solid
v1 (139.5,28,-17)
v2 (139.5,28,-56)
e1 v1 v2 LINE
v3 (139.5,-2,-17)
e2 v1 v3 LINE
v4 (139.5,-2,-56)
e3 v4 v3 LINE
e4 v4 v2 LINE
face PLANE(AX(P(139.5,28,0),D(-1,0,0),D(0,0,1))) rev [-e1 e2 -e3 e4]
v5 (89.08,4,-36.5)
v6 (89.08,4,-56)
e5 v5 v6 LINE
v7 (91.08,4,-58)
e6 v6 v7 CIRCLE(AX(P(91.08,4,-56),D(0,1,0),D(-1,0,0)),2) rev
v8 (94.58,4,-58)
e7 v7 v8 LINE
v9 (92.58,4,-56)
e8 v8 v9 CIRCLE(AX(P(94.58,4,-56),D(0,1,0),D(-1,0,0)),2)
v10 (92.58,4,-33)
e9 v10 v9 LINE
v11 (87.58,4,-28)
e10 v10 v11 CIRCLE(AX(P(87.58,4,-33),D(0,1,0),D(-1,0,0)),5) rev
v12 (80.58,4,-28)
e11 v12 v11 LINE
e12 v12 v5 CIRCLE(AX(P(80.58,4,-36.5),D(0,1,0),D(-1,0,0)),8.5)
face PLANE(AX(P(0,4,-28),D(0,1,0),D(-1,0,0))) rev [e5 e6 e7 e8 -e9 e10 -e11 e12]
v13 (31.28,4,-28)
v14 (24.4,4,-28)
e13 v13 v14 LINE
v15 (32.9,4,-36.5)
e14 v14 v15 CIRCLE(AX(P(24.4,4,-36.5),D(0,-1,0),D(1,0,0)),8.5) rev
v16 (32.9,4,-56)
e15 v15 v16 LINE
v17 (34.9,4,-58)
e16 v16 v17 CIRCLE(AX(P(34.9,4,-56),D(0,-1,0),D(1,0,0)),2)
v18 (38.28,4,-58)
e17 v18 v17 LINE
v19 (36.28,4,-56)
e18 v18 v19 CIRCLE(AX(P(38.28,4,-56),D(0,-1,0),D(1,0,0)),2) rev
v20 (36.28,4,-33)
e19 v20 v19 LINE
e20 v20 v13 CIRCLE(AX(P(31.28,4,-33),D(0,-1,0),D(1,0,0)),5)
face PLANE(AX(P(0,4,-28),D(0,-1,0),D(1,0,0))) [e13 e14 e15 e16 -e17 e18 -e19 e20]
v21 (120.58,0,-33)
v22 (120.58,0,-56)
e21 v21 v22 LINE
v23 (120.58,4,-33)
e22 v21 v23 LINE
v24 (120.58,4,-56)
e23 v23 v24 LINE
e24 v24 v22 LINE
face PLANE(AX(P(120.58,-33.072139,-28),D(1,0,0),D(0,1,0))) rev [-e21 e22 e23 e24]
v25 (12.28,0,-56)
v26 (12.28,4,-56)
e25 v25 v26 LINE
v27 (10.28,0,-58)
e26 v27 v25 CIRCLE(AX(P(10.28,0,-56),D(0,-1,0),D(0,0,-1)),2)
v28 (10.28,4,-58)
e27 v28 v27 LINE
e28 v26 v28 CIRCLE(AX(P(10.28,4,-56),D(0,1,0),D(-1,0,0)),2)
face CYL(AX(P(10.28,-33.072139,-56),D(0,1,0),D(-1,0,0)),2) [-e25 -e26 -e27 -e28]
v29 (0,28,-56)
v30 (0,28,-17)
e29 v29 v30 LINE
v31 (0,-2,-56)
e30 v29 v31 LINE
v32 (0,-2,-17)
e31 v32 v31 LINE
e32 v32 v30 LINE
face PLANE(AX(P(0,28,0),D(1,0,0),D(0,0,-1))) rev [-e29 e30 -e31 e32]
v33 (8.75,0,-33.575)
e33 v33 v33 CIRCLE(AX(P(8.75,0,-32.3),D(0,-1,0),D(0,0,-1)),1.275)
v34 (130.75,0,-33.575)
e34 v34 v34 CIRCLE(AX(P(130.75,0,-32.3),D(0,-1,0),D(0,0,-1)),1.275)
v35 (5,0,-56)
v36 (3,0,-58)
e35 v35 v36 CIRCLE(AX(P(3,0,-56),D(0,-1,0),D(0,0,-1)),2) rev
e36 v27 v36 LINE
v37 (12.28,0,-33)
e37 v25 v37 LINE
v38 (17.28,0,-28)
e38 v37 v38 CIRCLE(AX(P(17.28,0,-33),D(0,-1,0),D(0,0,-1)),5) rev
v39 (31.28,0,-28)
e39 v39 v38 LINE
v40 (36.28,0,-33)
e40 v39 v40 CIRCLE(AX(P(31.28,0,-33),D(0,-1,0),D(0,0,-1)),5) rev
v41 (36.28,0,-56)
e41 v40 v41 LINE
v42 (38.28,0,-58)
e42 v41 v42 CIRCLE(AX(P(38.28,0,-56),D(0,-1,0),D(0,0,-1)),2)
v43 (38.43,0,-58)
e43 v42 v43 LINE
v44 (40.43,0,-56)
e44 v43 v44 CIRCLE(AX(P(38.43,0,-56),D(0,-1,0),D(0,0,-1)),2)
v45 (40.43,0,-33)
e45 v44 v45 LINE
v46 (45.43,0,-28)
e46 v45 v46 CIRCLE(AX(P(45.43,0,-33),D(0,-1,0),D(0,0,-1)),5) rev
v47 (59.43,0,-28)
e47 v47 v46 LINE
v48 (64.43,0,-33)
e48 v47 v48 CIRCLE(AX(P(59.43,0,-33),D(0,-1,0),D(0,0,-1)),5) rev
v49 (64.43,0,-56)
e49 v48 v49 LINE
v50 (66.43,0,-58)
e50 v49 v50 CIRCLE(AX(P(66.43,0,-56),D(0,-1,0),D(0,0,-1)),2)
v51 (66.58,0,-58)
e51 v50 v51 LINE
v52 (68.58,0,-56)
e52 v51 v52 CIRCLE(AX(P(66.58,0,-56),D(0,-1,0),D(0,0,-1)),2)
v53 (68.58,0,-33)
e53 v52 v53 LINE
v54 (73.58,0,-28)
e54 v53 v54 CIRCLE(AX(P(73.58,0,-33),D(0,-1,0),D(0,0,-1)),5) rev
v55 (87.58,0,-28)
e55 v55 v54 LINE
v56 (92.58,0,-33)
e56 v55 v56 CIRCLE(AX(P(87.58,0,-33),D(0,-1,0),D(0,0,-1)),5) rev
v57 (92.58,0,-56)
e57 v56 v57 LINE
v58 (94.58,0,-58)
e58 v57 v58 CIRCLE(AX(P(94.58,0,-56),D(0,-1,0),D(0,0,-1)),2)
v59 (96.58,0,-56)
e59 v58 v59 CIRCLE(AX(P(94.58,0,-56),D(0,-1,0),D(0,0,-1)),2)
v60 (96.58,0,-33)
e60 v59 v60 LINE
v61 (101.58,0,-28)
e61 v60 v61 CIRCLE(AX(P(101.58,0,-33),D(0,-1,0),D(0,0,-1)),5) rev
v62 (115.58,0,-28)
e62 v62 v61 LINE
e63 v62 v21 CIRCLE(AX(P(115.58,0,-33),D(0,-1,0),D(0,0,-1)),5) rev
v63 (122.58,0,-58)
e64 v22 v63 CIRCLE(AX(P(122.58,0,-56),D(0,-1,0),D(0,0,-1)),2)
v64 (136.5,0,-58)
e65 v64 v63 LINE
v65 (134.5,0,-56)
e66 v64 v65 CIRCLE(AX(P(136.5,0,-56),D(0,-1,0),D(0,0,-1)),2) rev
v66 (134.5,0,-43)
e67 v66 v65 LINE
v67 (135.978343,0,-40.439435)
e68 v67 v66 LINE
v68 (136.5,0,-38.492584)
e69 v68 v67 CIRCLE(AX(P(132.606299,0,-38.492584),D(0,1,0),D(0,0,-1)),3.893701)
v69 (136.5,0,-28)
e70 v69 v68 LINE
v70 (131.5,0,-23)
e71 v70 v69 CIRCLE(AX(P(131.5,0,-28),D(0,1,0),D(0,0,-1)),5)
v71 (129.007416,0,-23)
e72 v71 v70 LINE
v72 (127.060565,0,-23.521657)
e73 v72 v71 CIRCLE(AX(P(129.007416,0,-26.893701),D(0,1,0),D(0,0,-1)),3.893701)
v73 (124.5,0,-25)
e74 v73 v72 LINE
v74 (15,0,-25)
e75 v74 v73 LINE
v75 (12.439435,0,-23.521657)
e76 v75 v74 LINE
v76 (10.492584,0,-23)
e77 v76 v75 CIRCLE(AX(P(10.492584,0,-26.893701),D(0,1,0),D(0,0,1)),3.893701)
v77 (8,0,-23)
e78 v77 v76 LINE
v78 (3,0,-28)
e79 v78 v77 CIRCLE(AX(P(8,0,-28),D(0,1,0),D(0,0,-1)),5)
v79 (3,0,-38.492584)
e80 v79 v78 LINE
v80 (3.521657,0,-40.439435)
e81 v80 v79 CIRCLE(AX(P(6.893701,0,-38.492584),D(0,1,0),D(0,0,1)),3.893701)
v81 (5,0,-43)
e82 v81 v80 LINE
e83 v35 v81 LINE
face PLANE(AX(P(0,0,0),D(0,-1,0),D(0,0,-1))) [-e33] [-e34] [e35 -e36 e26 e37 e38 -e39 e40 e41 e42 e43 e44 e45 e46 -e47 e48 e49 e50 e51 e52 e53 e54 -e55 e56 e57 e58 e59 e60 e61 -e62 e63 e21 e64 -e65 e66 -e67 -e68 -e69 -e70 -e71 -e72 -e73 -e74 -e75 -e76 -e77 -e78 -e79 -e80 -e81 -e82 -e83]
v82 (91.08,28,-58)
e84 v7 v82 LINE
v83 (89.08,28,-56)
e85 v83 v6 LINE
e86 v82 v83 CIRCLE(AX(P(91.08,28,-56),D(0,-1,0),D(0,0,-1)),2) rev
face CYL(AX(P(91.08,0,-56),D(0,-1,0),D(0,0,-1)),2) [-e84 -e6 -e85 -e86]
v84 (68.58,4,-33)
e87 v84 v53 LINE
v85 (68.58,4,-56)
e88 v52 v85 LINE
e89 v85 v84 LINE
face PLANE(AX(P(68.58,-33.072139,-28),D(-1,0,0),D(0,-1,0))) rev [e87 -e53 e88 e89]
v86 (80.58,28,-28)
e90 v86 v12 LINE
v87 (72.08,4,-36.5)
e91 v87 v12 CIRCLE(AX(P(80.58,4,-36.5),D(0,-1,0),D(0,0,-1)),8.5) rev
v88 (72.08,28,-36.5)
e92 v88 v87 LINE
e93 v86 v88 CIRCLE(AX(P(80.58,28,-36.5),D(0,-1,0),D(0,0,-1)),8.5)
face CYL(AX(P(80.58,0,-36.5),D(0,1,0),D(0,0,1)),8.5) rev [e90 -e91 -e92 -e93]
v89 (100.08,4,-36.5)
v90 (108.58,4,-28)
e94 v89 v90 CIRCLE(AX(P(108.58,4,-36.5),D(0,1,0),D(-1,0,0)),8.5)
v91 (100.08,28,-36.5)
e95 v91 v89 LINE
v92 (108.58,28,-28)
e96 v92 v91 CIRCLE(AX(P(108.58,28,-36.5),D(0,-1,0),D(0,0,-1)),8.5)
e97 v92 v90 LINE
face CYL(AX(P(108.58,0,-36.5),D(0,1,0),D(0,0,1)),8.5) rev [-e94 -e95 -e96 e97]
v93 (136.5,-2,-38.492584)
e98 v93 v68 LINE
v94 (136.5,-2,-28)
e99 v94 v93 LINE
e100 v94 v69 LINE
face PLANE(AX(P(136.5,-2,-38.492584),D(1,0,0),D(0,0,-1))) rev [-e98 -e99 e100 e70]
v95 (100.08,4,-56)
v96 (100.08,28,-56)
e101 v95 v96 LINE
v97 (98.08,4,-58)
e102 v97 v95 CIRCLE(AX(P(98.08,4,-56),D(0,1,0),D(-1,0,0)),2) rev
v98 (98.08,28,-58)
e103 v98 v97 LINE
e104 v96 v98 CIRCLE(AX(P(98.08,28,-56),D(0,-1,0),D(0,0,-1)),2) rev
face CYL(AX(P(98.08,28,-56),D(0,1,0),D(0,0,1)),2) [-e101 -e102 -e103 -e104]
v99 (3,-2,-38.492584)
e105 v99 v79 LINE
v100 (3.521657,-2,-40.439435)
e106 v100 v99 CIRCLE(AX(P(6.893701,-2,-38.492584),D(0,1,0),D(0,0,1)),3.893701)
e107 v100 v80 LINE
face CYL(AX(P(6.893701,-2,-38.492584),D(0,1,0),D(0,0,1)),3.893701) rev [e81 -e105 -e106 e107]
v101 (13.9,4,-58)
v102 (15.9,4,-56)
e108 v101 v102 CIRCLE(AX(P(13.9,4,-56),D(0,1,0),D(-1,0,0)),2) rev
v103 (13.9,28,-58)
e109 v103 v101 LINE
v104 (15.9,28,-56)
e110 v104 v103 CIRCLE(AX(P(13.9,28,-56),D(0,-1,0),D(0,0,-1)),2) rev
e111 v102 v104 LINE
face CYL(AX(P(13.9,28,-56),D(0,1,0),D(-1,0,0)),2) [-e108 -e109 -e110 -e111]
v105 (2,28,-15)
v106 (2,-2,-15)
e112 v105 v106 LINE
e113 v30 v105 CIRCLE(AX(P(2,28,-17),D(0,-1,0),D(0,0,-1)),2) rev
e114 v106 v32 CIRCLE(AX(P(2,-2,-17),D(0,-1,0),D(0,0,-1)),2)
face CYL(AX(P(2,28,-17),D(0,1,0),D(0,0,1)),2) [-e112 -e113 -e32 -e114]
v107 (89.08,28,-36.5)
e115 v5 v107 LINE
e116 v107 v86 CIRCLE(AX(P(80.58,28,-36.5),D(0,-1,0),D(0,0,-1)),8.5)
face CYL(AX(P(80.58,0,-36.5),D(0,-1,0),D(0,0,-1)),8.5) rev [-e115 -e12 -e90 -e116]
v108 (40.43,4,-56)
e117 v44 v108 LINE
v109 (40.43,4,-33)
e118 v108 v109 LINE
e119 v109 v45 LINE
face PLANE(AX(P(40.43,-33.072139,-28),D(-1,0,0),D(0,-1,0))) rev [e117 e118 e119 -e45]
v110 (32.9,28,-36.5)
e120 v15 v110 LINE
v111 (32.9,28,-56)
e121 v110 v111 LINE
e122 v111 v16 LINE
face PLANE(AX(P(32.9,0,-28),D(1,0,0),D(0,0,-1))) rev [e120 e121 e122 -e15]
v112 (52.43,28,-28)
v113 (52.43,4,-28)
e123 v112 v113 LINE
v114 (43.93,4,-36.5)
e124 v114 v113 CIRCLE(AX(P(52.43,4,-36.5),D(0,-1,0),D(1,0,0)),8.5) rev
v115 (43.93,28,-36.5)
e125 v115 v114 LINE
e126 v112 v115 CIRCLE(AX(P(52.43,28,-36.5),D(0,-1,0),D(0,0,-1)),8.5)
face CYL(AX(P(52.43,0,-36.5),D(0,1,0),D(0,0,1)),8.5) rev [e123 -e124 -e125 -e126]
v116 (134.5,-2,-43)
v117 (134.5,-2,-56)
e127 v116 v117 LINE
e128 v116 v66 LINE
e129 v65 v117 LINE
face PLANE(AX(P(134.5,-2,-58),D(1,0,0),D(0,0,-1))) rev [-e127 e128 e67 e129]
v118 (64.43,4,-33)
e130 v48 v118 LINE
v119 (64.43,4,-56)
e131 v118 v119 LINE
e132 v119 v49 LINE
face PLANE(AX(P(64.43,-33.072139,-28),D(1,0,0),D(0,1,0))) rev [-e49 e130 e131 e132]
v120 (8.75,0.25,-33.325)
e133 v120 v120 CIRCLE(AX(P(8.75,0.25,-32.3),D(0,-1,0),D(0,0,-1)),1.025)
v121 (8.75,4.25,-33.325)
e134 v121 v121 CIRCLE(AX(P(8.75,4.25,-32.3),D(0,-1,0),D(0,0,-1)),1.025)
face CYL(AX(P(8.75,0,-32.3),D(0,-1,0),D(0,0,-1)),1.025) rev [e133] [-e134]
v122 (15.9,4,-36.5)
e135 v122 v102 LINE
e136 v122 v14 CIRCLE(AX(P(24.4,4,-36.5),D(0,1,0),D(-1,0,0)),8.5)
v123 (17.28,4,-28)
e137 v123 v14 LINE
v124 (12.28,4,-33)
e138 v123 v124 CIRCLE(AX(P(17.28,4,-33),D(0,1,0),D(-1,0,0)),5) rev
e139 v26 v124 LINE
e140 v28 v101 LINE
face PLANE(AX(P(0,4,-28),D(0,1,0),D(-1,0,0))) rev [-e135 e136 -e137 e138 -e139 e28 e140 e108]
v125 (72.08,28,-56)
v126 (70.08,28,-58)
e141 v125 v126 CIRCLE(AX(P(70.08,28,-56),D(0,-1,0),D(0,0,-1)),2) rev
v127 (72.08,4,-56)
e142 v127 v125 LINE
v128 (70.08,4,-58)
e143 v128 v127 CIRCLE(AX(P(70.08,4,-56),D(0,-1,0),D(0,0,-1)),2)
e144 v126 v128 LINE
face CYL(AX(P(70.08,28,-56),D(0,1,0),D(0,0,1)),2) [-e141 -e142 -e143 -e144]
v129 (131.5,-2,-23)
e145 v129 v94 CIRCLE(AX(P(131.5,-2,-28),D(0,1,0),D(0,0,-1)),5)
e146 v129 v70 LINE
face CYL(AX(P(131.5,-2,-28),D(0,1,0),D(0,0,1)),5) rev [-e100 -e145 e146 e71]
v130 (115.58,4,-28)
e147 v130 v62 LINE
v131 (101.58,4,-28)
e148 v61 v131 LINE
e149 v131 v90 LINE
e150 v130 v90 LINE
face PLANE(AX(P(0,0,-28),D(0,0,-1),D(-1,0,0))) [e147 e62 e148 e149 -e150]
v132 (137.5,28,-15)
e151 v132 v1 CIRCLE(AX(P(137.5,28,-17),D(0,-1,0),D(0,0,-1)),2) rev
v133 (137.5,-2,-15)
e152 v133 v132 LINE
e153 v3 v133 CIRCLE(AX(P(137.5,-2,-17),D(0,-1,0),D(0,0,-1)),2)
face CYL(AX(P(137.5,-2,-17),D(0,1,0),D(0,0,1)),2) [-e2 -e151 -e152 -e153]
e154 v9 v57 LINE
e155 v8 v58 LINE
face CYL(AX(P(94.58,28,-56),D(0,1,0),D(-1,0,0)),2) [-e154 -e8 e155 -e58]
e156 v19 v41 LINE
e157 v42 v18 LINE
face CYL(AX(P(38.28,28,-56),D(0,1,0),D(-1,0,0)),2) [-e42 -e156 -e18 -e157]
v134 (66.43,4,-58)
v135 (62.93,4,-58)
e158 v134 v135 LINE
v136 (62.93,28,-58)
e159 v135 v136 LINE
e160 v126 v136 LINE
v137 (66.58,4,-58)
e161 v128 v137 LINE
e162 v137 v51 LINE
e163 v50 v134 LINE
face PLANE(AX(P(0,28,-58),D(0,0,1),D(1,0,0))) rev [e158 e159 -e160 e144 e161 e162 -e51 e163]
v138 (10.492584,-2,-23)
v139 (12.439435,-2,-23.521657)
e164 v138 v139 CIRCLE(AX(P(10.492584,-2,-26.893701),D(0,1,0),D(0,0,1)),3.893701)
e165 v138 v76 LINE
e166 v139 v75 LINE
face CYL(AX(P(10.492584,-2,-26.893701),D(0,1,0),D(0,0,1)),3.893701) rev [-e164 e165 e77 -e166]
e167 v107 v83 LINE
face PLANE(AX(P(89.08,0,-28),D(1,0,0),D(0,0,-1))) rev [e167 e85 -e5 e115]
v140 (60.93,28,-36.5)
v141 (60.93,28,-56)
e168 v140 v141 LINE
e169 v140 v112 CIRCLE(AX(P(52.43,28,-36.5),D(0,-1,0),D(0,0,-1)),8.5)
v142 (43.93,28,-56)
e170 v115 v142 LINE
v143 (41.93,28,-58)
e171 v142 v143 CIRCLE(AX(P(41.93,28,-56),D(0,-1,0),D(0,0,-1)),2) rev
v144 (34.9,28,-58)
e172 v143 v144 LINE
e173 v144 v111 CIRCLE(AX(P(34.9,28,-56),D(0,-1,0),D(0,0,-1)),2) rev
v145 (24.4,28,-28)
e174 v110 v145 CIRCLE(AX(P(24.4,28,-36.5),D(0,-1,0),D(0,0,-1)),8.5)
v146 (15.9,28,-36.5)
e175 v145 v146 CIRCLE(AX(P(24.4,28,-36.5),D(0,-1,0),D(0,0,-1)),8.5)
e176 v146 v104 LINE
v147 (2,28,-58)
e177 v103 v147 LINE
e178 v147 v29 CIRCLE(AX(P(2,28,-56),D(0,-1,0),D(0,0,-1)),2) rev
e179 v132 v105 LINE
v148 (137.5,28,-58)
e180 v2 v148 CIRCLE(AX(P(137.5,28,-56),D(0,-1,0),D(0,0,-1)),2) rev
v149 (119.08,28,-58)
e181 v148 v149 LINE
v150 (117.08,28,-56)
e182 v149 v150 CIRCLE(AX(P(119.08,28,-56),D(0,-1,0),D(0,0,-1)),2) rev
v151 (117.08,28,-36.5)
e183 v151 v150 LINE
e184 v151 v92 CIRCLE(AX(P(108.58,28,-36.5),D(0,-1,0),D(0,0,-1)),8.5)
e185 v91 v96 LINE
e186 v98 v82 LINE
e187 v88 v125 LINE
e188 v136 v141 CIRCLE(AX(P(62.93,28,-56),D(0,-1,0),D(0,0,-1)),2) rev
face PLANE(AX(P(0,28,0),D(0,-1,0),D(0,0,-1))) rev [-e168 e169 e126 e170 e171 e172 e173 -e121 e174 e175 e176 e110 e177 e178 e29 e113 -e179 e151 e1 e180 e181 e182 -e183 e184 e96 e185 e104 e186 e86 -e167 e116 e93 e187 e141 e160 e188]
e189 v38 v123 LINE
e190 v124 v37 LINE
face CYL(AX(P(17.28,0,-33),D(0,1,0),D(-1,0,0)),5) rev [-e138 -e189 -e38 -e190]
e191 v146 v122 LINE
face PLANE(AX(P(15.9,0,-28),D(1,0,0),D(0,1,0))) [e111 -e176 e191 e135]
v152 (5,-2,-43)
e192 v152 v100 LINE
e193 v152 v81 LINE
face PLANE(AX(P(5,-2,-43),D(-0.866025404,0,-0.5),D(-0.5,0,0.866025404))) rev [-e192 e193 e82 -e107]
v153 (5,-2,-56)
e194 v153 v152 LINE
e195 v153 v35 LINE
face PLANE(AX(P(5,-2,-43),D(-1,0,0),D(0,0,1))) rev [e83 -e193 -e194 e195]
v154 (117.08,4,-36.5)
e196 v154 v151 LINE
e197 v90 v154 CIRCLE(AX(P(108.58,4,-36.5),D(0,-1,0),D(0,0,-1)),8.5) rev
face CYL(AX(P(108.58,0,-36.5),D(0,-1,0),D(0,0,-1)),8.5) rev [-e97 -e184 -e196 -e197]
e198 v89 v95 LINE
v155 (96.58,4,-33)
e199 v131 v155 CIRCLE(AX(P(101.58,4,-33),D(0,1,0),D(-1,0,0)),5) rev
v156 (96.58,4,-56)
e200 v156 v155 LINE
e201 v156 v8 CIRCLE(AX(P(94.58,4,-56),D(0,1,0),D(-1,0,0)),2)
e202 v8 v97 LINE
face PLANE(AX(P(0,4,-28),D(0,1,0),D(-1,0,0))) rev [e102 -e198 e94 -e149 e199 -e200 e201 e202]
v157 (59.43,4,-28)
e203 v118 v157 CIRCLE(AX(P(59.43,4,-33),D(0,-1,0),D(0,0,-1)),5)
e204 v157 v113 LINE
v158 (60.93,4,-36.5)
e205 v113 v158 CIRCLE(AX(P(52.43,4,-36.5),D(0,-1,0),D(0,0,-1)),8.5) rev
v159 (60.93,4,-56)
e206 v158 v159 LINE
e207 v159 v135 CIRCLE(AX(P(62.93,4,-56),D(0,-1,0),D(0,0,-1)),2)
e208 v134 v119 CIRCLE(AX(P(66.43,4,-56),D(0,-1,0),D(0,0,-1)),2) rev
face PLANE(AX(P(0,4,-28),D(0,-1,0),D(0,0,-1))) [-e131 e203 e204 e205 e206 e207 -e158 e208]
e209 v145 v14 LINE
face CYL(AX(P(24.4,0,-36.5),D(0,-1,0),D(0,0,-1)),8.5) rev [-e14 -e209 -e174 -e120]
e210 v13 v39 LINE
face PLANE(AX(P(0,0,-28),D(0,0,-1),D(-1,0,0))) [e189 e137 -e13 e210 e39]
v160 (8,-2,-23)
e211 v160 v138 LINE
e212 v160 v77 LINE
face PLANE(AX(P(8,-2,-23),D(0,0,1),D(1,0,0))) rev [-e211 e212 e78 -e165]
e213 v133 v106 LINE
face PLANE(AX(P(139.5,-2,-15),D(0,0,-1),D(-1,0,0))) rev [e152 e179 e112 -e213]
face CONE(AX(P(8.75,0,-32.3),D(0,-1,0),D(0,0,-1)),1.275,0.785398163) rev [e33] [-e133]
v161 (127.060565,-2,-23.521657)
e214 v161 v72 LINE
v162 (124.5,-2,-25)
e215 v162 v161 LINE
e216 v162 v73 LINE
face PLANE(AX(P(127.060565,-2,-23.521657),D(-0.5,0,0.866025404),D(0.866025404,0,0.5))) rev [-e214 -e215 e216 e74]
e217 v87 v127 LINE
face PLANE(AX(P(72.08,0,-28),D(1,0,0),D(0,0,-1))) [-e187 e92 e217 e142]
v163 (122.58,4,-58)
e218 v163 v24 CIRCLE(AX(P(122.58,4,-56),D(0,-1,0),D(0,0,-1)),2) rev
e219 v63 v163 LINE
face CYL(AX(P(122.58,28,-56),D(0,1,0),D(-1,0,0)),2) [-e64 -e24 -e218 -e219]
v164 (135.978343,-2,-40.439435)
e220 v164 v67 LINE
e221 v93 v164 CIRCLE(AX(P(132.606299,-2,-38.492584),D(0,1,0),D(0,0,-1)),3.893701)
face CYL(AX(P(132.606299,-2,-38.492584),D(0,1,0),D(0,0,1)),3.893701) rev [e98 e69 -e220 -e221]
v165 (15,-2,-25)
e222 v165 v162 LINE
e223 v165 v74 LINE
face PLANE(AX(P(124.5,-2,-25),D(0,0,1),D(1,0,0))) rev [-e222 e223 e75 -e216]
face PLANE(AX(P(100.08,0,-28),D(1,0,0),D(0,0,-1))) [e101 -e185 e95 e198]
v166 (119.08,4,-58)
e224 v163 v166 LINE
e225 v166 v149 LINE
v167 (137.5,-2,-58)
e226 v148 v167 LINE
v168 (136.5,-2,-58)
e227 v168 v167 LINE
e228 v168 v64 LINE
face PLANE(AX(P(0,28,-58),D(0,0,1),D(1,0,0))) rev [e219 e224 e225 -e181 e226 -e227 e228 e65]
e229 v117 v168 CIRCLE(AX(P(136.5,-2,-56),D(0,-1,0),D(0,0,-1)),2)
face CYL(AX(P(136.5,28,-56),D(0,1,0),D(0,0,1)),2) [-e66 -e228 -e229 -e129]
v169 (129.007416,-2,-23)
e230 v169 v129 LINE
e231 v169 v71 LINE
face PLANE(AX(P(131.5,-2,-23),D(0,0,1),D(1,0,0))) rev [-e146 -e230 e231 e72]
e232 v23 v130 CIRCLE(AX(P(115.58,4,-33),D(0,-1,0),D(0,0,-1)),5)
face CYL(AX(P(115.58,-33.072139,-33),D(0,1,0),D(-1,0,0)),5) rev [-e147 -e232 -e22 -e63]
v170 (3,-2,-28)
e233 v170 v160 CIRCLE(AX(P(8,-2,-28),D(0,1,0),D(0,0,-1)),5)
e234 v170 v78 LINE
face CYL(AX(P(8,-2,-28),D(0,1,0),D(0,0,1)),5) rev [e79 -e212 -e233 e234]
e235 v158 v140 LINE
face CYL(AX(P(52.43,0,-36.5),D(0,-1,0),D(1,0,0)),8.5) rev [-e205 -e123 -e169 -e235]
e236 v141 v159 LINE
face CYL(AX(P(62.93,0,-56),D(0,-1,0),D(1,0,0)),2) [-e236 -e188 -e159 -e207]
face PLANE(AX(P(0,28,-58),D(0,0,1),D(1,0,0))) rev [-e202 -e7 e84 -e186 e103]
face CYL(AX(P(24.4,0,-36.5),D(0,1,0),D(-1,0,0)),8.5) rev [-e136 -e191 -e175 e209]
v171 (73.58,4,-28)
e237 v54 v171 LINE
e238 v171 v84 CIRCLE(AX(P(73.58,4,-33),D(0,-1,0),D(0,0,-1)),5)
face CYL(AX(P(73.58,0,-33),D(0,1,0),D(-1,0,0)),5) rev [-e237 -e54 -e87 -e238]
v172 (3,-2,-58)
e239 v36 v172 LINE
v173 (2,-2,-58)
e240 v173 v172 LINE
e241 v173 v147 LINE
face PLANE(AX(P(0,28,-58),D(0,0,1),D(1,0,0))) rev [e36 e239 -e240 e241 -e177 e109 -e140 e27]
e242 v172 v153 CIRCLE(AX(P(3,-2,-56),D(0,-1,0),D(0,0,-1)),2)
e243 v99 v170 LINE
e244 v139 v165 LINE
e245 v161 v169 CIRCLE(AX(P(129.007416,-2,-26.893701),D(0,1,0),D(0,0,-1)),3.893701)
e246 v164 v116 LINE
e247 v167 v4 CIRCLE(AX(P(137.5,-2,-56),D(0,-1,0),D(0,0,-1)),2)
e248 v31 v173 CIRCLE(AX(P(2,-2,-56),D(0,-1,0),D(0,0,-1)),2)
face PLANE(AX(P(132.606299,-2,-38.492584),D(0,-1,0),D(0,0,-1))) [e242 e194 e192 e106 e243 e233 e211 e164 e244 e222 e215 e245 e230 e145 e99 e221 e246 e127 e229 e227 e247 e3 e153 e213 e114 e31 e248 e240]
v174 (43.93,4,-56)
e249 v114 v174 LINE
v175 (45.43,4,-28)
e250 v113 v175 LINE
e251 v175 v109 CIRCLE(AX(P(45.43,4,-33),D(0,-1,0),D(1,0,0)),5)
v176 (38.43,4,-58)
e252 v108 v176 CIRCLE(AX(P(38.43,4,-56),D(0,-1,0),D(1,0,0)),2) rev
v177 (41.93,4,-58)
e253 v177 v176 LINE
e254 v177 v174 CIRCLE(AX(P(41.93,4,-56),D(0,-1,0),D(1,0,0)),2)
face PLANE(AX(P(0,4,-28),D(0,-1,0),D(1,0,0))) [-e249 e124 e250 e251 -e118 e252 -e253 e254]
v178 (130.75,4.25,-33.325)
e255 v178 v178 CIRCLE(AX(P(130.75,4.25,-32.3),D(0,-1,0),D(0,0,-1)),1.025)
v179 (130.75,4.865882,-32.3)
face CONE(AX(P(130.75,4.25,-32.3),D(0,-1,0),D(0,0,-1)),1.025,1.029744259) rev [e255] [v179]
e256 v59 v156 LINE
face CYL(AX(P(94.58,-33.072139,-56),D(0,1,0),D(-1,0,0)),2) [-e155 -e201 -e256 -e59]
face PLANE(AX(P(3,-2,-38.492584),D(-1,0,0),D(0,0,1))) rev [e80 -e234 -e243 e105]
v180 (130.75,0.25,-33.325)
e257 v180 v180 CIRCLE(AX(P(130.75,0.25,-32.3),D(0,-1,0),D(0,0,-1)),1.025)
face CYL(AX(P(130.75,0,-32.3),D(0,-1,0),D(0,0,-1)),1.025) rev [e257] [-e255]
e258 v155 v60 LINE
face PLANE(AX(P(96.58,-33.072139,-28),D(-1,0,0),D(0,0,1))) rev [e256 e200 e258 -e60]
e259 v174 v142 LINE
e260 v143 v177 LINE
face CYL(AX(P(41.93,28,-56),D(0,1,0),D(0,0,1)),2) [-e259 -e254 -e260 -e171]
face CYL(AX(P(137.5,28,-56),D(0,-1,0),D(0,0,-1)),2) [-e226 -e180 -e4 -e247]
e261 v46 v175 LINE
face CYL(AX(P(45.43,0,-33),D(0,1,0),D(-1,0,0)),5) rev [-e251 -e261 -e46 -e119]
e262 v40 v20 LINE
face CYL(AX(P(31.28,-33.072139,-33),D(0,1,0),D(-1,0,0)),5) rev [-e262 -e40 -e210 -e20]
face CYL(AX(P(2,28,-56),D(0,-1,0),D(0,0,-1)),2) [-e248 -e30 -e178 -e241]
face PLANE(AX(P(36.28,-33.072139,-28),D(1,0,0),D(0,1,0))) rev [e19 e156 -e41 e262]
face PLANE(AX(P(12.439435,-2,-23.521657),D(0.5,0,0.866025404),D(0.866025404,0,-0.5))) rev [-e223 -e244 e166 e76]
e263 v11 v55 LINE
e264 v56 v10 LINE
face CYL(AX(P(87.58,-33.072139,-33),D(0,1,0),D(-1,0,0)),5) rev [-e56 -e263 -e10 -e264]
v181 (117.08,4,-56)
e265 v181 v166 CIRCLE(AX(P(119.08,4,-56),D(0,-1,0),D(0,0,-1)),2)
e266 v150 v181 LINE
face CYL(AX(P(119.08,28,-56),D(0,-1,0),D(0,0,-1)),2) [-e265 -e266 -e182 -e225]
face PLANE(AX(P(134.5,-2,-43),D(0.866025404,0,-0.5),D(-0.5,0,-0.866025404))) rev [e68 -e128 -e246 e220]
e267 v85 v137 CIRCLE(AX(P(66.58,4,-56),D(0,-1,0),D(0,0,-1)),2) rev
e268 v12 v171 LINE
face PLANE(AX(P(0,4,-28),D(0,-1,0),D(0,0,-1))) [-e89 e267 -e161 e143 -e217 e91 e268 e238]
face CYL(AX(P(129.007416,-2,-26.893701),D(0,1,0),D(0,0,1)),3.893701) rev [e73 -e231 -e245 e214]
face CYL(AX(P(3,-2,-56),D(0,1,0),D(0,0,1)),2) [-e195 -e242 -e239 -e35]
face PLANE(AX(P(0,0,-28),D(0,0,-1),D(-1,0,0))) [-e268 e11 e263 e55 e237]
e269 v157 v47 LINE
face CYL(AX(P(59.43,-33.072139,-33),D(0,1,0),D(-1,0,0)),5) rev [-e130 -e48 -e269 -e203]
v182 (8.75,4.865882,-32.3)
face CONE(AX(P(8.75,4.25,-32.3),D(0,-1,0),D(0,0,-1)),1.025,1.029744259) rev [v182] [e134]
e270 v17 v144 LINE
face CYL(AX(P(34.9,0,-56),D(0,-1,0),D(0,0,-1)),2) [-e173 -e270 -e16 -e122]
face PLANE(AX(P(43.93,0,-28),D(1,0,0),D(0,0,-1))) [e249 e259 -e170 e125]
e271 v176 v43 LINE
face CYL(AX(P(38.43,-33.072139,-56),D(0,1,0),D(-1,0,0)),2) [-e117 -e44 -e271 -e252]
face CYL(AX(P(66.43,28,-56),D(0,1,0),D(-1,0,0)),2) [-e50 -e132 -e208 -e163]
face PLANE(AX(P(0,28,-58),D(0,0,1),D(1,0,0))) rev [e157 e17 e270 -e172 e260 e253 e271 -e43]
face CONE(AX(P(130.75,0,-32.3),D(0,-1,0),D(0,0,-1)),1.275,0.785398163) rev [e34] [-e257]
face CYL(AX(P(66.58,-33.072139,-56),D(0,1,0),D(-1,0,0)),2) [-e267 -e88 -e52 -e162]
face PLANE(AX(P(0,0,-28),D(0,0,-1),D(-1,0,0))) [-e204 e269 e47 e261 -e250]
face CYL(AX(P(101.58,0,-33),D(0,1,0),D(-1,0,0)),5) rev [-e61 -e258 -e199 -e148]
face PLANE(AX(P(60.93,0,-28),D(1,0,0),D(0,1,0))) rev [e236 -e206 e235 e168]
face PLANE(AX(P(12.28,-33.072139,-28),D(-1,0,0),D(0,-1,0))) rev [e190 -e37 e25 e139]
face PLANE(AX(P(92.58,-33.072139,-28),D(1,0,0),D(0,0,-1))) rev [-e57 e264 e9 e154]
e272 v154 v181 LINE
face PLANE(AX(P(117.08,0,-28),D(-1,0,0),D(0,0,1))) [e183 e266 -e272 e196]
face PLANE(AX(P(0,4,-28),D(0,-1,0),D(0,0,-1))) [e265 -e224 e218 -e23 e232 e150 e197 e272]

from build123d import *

# Parameters (mm, degrees)
SKIZZE1_W                        = 139.5
SKIZZE1_H                        = 58
AUFSATZ_LINEAR_AUSTRAGEN1_DEPTH  = 28
SCHNITT_LINEAR_AUSTRAGEN2_DEPTH  = 30
VERRUNDUNG1_R                    = 8.5
SKIZZE5_W                        = 7.28
SKIZZE5_H                        = 30
SKIZZE5_W_2                      = 4
SKIZZE5_W_3                      = 4.15
SKIZZE5_W_4                      = 13.92
AUFSATZ_LINEAR_AUSTRAGEN2_DEPTH  = 4
VERRUNDUNG2_R                    = 5
AUFSATZ_LINEAR_AUSTRAGEN3_DEPTH  = 2
VERRUNDUNG3_R                    = 2
VERRUNDUNG4_R                    = 2
SKIZZE7_W                        = 139.5
SKIZZE7_H                        = 15
SCHNITT_LINEAR_AUSTRAGEN5_DEPTH  = 155.026783385
VERRUNDUNG5_R                    = 2
M2_5_GEWINDEBOHRUNG1_D           = 2.05
M2_5_GEWINDEBOHRUNG1_DEPTH       = 4.25
M2_5_GEWINDEBOHRUNG1_CSINK_D     = 2.55
M2_5_GEWINDEBOHRUNG1_CSINK_ANGLE = 90
M2_5_GEWINDEBOHRUNG1_TIP         = 0.615882135


with BuildPart() as part:
    # Skizze1 → Aufsatz-Linear austragen1 (new body)
    with BuildSketch(Plane(origin=(0, 0, 0), x_dir=(1, 0, 0), z_dir=(0, 1, 0))):
        with Locations((69.75, 29)):
            Rectangle(SKIZZE1_W, SKIZZE1_H)
    extrude(amount=AUFSATZ_LINEAR_AUSTRAGEN1_DEPTH)

    # Skizze4 → Schnitt-Linear austragen2 (cut)
    with BuildSketch(Plane(origin=(0, 0, -58), x_dir=(-1, 0, 0), z_dir=(0, 0, -1))):
        Polygon((-3.63, 0), (-80.58, 0), (-134.5, 0), (-134.5, 4), (-117.08, 4), (-117.08, 28), (-108.58, 28), (-100.08, 28), (-100.08, 4), (-89.08, 4), (-89.08, 28), (-72.08, 28), (-72.08, 4), (-60.93, 4), (-60.93, 28), (-43.93, 28), (-43.93, 4), (-32.9, 4), (-32.9, 28), (-15.9, 28), (-15.9, 4), (-5, 4), (-5, 0), align=None)
    extrude(amount=-SCHNITT_LINEAR_AUSTRAGEN2_DEPTH, mode=Mode.SUBTRACT)

    # Verrundung1
    verrundung1_edges = [part.edges().sort_by_distance(p)[0] for p in [
        (15.9, 16, -28),
        (32.9, 16, -28),
        (43.93, 16, -28),
        (60.93, 16, -28),
        (72.08, 16, -28),
        (89.08, 16, -28),
        (100.08, 16, -28),
        (117.08, 16, -28),
    ]]
    fillet(verrundung1_edges, radius=VERRUNDUNG1_R - 0.0001)  # a hair under: the kernel refuses the full size

    # Skizze5 → Aufsatz-Linear austragen2 (add)
    with BuildSketch(Plane.XZ.offset(-4)):
        with Locations((8.64, -43)):
            Rectangle(SKIZZE5_W, SKIZZE5_H)
        with Locations((94.58, -43)):
            Rectangle(SKIZZE5_W_2, SKIZZE5_H)
        with Locations((66.505, -43)):
            Rectangle(SKIZZE5_W_3, SKIZZE5_H)
        with Locations((38.355, -43)):
            Rectangle(SKIZZE5_W_3, SKIZZE5_H)
        with Locations((127.54, -43)):
            Rectangle(SKIZZE5_W_4, SKIZZE5_H)
    extrude(amount=AUFSATZ_LINEAR_AUSTRAGEN2_DEPTH)

    # Verrundung2
    verrundung2_edges = [part.edges().sort_by_distance(p)[0] for p in [
        (12.28, 2, -28),
        (96.58, 2, -28),
        (92.58, 2, -28),
        (68.58, 2, -28),
        (64.43, 2, -28),
        (120.58, 2, -28),
        (40.43, 2, -28),
        (36.28, 2, -28),
    ]]
    fillet(verrundung2_edges, radius=VERRUNDUNG2_R)

    # Skizze6 → Aufsatz-Linear austragen3 (add)
    with BuildSketch(Plane.XZ):
        with BuildLine():
            Line((139.5, -58), (134.5, -58))
            Line((134.5, -58), (134.5, -43))
            Line((134.5, -43), (135.978342998, -40.439434817))
            ThreePointArc((135.978342998, -40.439434817), (136.36732536, -39.500348322), (136.5, -38.492584381))
            Line((136.5, -38.492584381), (136.5, -28))
            ThreePointArc((136.5, -28), (135.035533906, -24.464466094), (131.5, -23))
            Line((131.5, -23), (129.007415619, -23))
            ThreePointArc((129.007415619, -23), (127.999651678, -23.13267464), (127.060565183, -23.521657002))
            Line((127.060565183, -23.521657002), (124.5, -25))
            Line((124.5, -25), (15, -25))
            Line((15, -25), (12.439434817, -23.521657002))
            ThreePointArc((12.439434817, -23.521657002), (11.500348322, -23.13267464), (10.492584381, -23))
            Line((10.492584381, -23), (8, -23))
            ThreePointArc((8, -23), (4.464466094, -24.464466094), (3, -28))
            Line((3, -28), (3, -38.492584381))
            ThreePointArc((3, -38.492584381), (3.13267464, -39.500348322), (3.521657002, -40.439434817))
            Line((3.521657002, -40.439434817), (5, -43))
            Line((5, -43), (5, -58))
            Line((5, -58), (0, -58))
            Line((0, -58), (0, 0))
            Line((0, 0), (139.5, 0))
            Line((139.5, 0), (139.5, -58))
        make_face()
    extrude(amount=AUFSATZ_LINEAR_AUSTRAGEN3_DEPTH)

    # Verrundung3
    verrundung3_edges = [part.edges().sort_by_distance(p)[0] for p in [
        (117.08, 16, -58),
        (100.08, 16, -58),
        (72.08, 16, -58),
        (43.93, 16, -58),
        (15.9, 16, -58),
        (32.9, 16, -58),
        (60.93, 16, -58),
        (89.08, 16, -58),
        (0, 13, -58),
        (139.5, 13, -58),
        (139.5, 13, 0),
        (0, 13, 0),
    ]]
    fillet(verrundung3_edges, radius=VERRUNDUNG3_R)

    # Verrundung4
    verrundung4_edges = [part.edges().sort_by_distance(p)[0] for p in [
        (12.28, 2, -58),
        (96.58, 2, -58),
        (92.58, 2, -58),
        (68.58, 2, -58),
        (64.43, 2, -58),
        (120.58, 2, -58),
        (40.43, 2, -58),
        (36.28, 2, -58),
        (5, -1, -58),
        (134.5, -1, -58),
    ]]
    fillet(verrundung4_edges, radius=VERRUNDUNG4_R - 0.0001)  # a hair under: the kernel refuses the full size

    # Skizze7 → Schnitt-Linear austragen5 (cut, through all)
    with BuildSketch(Plane(origin=(0, 28, 0), x_dir=(1, 0, 0), z_dir=(0, 1, 0))):
        with Locations((69.75, 7.5)):
            Rectangle(SKIZZE7_W, SKIZZE7_H)
    extrude(amount=-SCHNITT_LINEAR_AUSTRAGEN5_DEPTH, mode=Mode.SUBTRACT)

    # Verrundung5
    verrundung5_edges = [part.edges().sort_by_distance(p)[0] for p in [
        (139.5, 13, -15),
        (0, 13, -15),
    ]]
    fillet(verrundung5_edges, radius=VERRUNDUNG5_R)

    # M2.5 Gewindebohrung1
    with Locations(Plane(origin=(0, 0, 0), x_dir=(-1, 0, 0), z_dir=(0, -1, 0))):
        with Locations((-130.75, 32.3), (-8.75, 32.3)):
            CounterSinkHole(M2_5_GEWINDEBOHRUNG1_D / 2, M2_5_GEWINDEBOHRUNG1_CSINK_D / 2, depth=M2_5_GEWINDEBOHRUNG1_DEPTH, counter_sink_angle=M2_5_GEWINDEBOHRUNG1_CSINK_ANGLE)
            with Locations((0, 0, -(M2_5_GEWINDEBOHRUNG1_DEPTH + M2_5_GEWINDEBOHRUNG1_TIP / 2))):  # 118° drill point
                Cone(0, M2_5_GEWINDEBOHRUNG1_D / 2, M2_5_GEWINDEBOHRUNG1_TIP, mode=Mode.SUBTRACT)


solid = part.part
